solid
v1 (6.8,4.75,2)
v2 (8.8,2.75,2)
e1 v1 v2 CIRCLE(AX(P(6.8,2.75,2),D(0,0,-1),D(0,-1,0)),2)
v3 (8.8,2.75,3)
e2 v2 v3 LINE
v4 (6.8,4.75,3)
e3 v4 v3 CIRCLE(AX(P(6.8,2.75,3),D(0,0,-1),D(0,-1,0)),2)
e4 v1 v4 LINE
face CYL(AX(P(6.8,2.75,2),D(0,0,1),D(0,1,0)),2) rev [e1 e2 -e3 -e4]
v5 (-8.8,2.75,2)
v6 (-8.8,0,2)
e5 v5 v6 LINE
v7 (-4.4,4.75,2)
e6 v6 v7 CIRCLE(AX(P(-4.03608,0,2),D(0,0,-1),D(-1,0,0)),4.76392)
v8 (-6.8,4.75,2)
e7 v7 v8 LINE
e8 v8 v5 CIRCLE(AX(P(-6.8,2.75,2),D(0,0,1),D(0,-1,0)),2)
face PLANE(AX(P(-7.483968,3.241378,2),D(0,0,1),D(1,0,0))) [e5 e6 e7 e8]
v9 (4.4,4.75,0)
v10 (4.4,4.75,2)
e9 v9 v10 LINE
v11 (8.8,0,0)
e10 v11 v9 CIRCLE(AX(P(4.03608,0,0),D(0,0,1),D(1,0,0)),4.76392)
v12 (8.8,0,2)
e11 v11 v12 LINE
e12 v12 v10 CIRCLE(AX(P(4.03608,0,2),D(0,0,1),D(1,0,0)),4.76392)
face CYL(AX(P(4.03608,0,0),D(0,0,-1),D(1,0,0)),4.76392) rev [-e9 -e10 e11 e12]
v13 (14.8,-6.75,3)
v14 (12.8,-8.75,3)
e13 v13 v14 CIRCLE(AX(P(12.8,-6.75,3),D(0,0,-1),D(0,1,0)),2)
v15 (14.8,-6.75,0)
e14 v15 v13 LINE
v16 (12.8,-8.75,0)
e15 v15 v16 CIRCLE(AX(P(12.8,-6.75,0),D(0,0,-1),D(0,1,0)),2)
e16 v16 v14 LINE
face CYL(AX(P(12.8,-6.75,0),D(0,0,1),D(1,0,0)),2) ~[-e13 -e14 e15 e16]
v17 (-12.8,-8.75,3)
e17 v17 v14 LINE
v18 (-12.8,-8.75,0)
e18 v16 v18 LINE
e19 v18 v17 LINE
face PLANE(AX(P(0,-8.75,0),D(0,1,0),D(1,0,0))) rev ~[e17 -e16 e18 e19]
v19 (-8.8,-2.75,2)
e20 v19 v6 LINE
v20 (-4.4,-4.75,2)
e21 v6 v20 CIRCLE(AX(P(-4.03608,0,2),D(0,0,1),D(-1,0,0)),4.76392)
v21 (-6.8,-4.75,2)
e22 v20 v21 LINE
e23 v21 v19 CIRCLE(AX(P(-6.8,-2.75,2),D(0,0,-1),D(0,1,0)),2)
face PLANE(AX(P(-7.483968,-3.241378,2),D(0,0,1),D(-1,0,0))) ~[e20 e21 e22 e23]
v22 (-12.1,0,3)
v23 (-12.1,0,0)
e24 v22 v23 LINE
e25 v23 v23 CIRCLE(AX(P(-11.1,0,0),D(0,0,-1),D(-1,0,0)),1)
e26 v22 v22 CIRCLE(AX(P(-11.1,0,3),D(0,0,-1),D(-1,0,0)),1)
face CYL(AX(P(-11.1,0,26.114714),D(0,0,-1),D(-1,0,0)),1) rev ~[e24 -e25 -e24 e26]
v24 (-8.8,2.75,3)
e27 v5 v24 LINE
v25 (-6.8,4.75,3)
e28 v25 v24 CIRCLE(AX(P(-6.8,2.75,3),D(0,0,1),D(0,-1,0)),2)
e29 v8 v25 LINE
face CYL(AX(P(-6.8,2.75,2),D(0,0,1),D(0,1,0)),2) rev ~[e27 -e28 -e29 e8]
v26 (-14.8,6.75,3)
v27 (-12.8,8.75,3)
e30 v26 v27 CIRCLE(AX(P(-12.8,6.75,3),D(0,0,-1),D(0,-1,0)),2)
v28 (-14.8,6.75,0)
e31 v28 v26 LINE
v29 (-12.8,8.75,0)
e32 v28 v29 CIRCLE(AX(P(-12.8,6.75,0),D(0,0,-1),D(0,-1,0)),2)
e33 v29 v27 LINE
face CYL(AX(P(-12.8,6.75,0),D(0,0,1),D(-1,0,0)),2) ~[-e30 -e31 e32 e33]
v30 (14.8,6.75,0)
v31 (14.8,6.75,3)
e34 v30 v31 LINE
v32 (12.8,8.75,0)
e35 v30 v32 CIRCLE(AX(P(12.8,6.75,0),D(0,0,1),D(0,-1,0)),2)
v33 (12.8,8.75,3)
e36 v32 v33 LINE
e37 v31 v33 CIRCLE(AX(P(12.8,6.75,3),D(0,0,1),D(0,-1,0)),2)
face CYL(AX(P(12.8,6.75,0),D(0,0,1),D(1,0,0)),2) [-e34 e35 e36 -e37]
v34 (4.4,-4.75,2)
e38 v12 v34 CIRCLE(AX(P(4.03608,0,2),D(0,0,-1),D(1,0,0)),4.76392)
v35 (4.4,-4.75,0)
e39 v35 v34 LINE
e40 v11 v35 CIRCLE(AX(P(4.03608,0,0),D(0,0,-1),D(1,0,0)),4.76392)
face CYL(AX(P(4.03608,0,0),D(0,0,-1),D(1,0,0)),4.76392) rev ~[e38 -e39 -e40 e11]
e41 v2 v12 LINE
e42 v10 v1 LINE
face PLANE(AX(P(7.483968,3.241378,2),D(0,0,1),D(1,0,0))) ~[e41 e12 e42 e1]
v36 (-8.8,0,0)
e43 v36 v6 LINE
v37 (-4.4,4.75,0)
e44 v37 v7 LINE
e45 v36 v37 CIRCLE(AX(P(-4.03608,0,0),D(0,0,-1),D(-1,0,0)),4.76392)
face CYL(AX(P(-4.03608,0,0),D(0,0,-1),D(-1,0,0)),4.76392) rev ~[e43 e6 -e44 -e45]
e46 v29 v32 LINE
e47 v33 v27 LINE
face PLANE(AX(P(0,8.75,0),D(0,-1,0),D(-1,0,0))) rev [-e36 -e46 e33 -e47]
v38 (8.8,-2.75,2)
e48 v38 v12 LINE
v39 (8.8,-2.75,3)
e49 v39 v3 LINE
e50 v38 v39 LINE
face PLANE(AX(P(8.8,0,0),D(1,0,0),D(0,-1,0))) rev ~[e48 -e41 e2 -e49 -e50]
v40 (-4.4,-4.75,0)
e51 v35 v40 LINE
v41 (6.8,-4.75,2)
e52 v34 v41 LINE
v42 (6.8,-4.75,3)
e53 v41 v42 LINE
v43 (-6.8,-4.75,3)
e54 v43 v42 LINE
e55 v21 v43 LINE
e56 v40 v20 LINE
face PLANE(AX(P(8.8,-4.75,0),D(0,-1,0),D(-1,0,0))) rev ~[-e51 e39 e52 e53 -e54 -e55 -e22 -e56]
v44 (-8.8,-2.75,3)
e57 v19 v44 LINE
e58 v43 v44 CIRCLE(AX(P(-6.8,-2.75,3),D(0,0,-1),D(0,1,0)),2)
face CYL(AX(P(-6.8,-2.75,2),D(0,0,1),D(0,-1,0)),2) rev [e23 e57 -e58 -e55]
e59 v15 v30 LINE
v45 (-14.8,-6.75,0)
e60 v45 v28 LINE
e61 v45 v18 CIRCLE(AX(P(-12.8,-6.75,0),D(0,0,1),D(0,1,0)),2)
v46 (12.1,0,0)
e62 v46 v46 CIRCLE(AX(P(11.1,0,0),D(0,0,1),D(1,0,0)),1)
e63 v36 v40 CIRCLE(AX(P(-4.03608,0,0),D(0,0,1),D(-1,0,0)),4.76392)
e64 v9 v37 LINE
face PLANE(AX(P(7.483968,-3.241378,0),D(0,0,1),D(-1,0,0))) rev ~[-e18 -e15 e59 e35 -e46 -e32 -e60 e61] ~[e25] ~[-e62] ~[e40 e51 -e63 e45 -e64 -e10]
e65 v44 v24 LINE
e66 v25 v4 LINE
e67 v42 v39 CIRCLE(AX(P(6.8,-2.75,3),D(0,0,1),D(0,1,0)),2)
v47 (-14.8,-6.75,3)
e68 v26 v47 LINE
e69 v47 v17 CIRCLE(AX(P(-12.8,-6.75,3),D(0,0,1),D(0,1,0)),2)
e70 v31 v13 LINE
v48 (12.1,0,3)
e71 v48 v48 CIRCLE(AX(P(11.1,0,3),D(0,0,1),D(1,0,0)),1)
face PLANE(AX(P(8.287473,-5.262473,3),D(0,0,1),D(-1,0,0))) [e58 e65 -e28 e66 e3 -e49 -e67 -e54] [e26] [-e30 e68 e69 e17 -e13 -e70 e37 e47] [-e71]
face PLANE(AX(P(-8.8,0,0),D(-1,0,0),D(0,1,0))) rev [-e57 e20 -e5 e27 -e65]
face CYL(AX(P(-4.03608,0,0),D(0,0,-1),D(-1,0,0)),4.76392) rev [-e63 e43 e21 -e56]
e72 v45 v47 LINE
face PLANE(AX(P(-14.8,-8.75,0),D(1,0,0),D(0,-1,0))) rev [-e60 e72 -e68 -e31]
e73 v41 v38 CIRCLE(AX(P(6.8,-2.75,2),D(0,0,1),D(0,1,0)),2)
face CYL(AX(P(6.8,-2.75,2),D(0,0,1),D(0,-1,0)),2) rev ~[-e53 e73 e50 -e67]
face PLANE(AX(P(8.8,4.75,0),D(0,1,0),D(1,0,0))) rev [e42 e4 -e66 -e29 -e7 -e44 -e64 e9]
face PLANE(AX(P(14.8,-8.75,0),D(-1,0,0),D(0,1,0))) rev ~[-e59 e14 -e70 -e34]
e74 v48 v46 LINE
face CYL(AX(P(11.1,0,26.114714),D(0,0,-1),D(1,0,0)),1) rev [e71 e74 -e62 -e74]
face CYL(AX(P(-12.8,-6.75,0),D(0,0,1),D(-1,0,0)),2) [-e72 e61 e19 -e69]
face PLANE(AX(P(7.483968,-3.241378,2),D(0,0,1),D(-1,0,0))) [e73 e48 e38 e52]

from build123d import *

# Parameters (mm, degrees)
F1_DEPTH = 3
F2_DEPTH = 2
F3_R     = 2
F6_D     = 2


# Not quite as in the source:
# - a feature names something its author has since deleted; it is built from what else it names


with BuildPart() as f1:
    # F0 (on Top) → F1 (new body)
    with BuildSketch(Plane.XY):
        Polygon((-4.4, 4.75), (0, 4.75), (0, 8.75), (-14.8, 8.75), (-14.8, 0), (-8.8, 0), (-8.8, 4.75), align=None)
    extrude(amount=F1_DEPTH)

    # F0 (on Top) → F2 (join)
    with BuildSketch(Plane.XY):
        with BuildLine():
            ThreePointArc((-8.8, 0), (-7.5309776981, 3.2373793414), (-4.4, 4.75))
            Line((-4.4, 4.75), (-8.8, 4.75))
            Line((-8.8, 4.75), (-8.8, 0))
        make_face()
    extrude(amount=F2_DEPTH)

    # F3
    f3_edges = [f1.edges().sort_by_distance(p)[0] for p in [
        (-14.8, 8.75, 1.5),
        (-8.8, 4.75, 2.5),
    ]]
    fillet(f3_edges, radius=F3_R)

    # F4: F1 across face


with BuildPart() as f1_1:
    add(f1.part)
    add(f1.part.mirror(Plane(origin=(-11.8, 0, 1.5), x_dir=(1, 0, 0), z_dir=(0, -1, 0))))

    # F6 (through all)
    with Locations(Plane.XY.offset(3)):
        with Locations((-11.1, 0)):
            Hole(F6_D / 2)

    # F7: F1 across face


with BuildPart() as f1_2:
    add(f1_1.part)
    add(f1_1.part.mirror(Plane(origin=(0, 6.75, 1.5), x_dir=(0, 1, 0), z_dir=(1, 0, 0))))


solid = f1_2.part
